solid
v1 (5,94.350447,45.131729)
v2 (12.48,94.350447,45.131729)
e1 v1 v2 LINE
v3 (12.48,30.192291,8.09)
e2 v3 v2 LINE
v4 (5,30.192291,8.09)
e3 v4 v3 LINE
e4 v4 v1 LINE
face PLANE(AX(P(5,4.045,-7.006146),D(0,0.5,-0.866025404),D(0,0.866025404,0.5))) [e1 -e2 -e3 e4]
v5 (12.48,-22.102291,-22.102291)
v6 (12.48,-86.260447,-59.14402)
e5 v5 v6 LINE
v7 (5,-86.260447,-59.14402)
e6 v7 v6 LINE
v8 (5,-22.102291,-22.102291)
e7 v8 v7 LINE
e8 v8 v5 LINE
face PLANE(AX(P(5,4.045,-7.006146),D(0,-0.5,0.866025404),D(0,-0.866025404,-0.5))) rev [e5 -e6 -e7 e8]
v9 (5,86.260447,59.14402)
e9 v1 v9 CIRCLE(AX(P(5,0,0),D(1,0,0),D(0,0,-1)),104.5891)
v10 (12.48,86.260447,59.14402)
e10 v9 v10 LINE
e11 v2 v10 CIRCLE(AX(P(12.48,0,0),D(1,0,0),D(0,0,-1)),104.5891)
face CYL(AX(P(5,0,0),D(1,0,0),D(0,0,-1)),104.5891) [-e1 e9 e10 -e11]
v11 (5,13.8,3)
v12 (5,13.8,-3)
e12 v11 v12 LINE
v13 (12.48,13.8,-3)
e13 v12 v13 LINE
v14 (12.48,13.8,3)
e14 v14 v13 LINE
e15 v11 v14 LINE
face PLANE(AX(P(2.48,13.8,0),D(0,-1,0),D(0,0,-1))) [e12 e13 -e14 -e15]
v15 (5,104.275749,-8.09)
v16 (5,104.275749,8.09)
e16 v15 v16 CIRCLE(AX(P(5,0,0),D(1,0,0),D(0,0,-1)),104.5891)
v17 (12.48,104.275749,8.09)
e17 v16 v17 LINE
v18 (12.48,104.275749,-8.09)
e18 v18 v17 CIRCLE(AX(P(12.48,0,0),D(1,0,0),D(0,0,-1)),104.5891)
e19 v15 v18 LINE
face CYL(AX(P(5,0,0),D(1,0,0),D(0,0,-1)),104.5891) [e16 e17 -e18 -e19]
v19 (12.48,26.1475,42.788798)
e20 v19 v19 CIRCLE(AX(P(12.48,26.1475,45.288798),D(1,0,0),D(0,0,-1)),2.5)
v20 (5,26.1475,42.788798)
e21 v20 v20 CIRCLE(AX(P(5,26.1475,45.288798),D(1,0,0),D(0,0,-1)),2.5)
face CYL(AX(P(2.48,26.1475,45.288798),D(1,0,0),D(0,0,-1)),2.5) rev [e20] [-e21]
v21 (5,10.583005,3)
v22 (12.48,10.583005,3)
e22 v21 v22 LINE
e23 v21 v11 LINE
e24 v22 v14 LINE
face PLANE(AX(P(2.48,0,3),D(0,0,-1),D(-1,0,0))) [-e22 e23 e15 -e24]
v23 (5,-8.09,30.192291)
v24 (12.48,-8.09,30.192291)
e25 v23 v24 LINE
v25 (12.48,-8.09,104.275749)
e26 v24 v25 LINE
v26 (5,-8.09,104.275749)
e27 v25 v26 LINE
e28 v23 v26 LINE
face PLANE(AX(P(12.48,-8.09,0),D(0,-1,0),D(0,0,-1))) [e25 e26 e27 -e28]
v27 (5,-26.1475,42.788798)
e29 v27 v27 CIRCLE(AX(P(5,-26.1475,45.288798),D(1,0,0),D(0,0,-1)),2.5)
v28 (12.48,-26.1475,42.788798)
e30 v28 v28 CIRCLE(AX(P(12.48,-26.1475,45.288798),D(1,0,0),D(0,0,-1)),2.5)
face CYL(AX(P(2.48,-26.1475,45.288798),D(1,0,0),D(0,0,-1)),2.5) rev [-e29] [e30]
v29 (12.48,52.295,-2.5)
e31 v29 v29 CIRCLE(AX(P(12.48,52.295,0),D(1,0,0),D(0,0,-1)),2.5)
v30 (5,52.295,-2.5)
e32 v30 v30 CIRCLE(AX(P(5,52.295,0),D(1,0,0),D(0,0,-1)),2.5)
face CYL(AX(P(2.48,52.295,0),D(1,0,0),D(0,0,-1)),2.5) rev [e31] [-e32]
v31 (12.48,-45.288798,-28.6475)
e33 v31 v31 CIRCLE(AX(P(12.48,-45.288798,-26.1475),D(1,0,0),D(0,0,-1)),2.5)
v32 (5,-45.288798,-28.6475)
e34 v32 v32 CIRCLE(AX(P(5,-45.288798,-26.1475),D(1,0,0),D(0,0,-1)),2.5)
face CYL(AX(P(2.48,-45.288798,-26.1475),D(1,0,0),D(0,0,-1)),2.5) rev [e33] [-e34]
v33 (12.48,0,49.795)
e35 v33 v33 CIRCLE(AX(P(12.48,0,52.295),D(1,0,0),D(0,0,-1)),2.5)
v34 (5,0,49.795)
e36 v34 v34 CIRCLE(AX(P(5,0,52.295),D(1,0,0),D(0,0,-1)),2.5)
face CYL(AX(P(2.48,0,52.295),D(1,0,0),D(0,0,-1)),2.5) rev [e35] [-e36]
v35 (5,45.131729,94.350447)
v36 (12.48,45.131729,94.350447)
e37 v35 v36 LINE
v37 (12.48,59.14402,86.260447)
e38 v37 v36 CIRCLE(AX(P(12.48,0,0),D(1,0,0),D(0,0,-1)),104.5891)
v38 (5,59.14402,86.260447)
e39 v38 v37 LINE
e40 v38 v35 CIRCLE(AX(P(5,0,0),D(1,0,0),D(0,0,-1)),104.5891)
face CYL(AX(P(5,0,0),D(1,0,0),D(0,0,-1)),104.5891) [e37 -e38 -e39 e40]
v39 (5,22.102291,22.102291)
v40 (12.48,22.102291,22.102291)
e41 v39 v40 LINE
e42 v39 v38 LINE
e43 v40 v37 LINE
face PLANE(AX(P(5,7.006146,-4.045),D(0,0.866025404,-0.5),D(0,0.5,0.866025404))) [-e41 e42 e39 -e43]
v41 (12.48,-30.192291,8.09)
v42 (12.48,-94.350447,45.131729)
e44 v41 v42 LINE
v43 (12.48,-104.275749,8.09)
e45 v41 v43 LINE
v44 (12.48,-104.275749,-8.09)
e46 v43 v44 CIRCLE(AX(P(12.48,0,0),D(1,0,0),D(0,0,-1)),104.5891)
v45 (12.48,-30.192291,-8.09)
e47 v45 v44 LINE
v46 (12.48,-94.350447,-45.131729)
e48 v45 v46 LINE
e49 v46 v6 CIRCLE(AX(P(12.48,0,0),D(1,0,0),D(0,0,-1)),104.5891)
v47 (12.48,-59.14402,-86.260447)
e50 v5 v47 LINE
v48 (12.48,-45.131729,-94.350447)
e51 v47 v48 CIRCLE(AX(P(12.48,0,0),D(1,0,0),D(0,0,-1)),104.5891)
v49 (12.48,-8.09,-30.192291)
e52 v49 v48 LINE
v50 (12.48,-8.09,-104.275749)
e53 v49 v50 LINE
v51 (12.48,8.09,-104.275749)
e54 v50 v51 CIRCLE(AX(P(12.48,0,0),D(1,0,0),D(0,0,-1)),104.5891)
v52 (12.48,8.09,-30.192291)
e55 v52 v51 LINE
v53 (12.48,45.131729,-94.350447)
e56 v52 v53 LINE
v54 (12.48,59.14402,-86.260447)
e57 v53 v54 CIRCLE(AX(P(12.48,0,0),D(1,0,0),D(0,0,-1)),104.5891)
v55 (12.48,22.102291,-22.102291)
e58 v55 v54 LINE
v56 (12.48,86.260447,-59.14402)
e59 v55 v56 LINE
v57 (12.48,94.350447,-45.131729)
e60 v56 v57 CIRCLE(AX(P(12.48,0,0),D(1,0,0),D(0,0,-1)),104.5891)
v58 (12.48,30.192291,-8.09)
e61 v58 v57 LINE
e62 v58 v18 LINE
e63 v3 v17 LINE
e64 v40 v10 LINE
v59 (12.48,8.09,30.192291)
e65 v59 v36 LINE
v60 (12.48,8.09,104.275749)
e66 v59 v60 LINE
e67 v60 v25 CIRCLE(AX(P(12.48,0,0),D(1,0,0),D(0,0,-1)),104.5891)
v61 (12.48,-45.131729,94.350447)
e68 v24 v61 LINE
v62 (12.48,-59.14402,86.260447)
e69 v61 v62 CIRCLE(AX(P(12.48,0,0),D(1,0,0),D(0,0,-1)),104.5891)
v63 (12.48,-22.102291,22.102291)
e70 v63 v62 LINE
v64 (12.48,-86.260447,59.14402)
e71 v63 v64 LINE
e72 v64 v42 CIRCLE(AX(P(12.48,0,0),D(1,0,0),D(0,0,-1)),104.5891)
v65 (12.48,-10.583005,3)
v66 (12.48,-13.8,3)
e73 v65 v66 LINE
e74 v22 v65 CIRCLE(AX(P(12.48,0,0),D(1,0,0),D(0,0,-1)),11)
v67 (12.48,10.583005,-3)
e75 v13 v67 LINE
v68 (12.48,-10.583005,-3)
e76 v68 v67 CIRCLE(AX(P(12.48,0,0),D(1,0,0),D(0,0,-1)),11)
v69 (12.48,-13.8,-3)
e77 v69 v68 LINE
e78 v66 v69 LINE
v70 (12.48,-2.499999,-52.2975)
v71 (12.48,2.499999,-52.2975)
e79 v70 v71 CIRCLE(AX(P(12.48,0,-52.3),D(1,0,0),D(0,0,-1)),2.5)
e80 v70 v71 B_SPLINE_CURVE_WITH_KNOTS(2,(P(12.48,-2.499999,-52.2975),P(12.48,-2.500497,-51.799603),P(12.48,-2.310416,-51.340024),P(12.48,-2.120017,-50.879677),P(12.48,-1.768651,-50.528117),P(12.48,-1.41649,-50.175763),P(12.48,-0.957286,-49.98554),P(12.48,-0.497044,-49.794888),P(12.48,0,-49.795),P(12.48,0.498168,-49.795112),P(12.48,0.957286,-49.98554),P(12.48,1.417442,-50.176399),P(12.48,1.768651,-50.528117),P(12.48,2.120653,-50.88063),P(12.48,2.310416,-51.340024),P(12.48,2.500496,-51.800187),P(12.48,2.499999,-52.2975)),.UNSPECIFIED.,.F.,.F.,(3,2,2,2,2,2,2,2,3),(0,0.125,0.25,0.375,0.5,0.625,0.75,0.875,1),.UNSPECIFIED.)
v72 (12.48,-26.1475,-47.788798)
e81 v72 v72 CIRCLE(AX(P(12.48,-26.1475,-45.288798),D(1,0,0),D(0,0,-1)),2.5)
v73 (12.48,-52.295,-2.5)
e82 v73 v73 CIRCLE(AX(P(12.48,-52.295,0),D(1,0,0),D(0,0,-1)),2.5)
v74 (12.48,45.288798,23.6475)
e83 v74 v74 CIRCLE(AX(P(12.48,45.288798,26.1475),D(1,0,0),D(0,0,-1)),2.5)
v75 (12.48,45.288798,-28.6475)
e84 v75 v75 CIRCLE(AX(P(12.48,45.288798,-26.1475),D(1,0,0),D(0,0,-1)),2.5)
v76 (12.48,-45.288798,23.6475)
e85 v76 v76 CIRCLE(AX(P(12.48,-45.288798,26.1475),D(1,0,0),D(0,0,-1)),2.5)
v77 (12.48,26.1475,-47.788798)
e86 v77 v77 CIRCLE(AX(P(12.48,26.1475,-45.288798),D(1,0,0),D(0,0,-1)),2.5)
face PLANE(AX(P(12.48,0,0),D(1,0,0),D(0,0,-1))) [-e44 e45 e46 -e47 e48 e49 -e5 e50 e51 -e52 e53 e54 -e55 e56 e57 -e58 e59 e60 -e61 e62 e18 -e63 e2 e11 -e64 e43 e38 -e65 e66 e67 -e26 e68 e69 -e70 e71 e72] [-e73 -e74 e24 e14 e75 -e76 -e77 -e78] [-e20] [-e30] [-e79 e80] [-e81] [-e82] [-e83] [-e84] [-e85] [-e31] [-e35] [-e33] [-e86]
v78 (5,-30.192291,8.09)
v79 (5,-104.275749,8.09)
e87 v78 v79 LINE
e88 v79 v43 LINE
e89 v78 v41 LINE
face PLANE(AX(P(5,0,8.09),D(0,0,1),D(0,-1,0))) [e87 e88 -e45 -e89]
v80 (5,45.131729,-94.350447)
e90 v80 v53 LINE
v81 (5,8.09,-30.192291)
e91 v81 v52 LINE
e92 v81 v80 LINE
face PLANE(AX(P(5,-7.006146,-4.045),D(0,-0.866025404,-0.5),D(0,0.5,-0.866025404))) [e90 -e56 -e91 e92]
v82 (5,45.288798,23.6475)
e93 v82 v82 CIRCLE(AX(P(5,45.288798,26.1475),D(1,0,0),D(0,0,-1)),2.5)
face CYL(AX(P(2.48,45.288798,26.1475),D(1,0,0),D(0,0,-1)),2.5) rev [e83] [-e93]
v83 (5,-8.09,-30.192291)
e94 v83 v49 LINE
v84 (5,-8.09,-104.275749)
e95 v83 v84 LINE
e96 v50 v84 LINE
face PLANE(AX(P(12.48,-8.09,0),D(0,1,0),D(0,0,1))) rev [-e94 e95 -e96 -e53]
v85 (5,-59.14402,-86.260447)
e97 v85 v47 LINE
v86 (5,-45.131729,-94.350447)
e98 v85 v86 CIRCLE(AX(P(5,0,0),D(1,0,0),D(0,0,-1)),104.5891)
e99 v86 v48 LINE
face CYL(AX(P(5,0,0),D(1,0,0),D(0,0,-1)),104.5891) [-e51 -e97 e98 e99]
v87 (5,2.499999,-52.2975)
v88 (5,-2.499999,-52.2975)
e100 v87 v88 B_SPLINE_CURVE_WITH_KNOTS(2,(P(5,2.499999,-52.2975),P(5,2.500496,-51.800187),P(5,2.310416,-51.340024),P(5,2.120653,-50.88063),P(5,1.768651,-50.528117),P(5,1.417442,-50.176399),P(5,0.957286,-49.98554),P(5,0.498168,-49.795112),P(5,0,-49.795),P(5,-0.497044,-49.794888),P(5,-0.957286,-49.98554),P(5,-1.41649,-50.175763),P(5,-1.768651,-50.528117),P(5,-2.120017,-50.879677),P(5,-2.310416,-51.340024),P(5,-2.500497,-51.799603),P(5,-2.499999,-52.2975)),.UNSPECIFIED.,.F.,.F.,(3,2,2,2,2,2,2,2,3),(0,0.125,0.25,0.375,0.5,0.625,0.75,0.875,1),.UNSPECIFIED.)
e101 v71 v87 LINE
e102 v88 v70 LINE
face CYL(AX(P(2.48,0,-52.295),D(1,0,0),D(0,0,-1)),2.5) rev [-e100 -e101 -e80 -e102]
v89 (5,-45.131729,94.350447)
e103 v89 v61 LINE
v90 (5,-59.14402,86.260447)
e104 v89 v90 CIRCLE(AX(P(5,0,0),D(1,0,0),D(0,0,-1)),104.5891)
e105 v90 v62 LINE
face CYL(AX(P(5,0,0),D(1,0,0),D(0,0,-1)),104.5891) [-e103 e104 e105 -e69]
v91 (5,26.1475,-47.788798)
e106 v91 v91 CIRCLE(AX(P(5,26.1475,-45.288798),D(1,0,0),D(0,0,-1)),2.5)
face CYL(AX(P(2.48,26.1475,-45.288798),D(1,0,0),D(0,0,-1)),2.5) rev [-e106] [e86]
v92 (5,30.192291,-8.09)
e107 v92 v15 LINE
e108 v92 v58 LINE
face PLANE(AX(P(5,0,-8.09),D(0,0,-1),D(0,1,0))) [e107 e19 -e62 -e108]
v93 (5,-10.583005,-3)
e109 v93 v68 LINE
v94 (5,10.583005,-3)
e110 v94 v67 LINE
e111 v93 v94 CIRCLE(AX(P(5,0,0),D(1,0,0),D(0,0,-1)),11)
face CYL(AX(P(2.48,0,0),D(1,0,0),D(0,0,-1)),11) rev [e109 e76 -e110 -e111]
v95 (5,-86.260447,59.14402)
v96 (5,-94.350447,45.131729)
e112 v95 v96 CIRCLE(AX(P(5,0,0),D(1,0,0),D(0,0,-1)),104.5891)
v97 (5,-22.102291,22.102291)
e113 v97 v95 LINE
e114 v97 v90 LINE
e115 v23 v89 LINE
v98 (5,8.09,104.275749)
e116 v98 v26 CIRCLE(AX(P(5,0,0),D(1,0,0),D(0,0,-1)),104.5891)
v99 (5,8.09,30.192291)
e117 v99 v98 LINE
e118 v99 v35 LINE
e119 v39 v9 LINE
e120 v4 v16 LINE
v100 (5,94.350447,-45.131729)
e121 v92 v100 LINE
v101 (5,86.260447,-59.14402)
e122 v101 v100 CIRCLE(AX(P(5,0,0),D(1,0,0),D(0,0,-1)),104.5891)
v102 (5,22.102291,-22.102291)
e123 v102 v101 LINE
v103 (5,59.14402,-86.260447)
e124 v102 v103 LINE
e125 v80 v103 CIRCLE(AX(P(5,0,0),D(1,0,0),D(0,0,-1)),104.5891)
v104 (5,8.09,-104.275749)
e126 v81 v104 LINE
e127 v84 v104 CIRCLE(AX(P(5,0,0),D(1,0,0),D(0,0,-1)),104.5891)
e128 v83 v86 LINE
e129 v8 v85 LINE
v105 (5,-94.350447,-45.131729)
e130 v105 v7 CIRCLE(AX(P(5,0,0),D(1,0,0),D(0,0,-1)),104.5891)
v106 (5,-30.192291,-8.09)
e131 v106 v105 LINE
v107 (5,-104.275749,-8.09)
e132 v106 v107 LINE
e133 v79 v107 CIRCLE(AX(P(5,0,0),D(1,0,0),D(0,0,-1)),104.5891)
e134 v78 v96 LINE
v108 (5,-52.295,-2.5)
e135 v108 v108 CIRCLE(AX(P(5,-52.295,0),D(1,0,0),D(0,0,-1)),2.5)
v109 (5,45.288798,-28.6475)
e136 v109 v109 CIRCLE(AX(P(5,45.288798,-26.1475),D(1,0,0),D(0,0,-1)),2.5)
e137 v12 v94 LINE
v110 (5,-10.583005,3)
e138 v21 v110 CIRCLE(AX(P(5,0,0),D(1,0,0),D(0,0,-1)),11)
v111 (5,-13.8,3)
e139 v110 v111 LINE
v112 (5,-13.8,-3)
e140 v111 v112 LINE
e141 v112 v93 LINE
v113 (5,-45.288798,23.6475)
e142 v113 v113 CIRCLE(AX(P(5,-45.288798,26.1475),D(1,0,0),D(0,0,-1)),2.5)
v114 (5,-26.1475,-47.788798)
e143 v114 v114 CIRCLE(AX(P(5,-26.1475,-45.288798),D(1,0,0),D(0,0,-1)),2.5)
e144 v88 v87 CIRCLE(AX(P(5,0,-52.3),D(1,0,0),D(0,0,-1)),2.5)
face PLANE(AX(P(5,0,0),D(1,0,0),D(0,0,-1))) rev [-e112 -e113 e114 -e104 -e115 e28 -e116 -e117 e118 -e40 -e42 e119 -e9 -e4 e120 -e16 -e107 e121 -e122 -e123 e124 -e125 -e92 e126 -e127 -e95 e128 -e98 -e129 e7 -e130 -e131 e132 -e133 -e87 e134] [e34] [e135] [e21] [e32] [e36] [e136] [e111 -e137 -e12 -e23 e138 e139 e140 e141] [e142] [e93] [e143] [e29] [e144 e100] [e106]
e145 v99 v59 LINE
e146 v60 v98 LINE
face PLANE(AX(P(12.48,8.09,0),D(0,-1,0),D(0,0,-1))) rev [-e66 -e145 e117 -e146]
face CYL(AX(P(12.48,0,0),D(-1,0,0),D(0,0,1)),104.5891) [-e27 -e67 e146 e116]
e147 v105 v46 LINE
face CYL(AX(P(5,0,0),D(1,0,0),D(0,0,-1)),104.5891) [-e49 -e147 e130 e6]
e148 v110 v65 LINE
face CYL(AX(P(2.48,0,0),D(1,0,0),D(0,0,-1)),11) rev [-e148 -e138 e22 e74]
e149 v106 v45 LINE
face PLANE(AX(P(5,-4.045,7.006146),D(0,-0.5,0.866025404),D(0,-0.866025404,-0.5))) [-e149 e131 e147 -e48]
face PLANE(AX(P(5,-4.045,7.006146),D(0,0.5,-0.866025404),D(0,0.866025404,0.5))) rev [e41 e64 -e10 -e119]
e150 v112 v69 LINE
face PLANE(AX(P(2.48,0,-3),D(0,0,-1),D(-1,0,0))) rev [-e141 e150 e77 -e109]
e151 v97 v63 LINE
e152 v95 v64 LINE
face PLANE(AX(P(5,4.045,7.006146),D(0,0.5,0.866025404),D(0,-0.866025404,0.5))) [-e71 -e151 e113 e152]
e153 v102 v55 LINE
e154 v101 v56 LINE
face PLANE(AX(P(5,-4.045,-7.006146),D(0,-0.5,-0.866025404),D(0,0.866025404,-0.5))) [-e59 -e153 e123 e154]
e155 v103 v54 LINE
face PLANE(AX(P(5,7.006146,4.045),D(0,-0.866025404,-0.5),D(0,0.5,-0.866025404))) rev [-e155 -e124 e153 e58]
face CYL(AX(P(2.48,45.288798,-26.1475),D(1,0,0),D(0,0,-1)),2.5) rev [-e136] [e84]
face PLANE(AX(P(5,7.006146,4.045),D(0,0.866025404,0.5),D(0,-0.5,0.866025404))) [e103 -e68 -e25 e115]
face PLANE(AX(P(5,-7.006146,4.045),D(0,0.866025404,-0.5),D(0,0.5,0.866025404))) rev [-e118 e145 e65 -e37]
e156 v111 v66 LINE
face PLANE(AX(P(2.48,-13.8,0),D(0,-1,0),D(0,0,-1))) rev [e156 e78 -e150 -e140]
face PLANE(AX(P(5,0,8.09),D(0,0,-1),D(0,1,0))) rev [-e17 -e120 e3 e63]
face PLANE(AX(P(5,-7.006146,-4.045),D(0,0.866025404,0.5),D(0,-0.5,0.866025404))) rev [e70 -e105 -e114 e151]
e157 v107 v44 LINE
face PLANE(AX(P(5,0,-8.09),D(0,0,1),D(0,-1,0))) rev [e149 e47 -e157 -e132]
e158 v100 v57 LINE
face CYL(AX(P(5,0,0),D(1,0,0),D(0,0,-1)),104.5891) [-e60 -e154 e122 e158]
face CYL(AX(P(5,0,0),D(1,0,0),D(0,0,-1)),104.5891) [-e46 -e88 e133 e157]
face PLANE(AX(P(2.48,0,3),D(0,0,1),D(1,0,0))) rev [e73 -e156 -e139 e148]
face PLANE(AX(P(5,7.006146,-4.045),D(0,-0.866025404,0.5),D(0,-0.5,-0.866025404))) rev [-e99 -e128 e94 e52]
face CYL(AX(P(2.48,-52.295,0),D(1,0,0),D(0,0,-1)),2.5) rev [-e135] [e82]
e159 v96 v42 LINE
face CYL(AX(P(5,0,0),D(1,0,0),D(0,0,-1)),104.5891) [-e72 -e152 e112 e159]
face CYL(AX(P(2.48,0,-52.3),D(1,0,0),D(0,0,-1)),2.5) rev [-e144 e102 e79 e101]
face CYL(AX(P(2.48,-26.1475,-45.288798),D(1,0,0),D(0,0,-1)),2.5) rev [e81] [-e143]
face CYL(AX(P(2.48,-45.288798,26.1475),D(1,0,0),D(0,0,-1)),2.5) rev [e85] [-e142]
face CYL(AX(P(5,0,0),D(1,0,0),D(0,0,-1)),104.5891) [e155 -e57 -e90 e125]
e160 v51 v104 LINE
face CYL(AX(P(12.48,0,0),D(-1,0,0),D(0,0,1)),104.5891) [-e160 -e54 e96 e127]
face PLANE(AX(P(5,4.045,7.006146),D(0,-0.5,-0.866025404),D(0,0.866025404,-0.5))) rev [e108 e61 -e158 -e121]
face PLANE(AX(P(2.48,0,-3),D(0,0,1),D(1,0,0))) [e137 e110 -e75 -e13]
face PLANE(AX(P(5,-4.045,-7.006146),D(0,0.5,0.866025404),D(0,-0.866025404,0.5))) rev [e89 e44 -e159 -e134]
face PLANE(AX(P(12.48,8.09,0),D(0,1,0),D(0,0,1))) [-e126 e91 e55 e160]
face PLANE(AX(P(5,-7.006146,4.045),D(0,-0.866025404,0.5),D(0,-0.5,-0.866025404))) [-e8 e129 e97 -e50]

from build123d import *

# Parameters (mm, degrees)
SKETCH1_W           = 450
SKETCH1_H           = 450
BOSS_EXTRUDE1_DEPTH = 5
BOSS_EXTRUDE2_DEPTH = 7.48
BOSS_EXTRUDE3_DEPTH = 7.48
SKETCH6_W           = 450
SKETCH6_H           = 450
CUT_EXTRUDE1_DEPTH  = 5
SKETCH7_R           = 11
SKETCH7_R_2         = 2.5
CUT_EXTRUDE2_DEPTH  = 10
SKETCH8_R           = 209.3091
SKETCH8_R_2         = 104.5891
CUT_EXTRUDE3_DEPTH  = 10
BOSS_EXTRUDE4_DEPTH = 7.48
SKETCH11_R          = 2.5
CUT_EXTRUDE5_DEPTH  = 10


# Read off the part's stored shape, not the designer's step: Boss-Extrude2
with BuildPart() as part:
    # Sketch1 → Boss-Extrude1 (new body)
    with BuildSketch(Plane(origin=(0, 0, 0), x_dir=(0, 0, -1), z_dir=(1, 0, 0))):
        Rectangle(SKETCH1_W, SKETCH1_H)
    extrude(amount=BOSS_EXTRUDE1_DEPTH)

    # Boss-Extrude2 outline → Boss-Extrude2 (add)
    with BuildSketch(Plane(origin=(5, 0, 0), x_dir=(0, 0, -1), z_dir=(1, 0, 0))):
        with BuildLine():
            Line((-164.971757583, 8.09), (-209.152698388, 8.09))
            ThreePointArc((-209.152698388, 8.09), (-209.3091, 0), (-209.152698388, -8.09))
            Line((-209.152698388, -8.09), (-164.971757583, -8.09))
            ThreePointArc((-164.971757583, -8.09), (-116.792827049, -116.792827049), (-8.09, -164.971757583))
            Line((-8.09, -164.971757583), (-8.09, -209.152698388))
            ThreePointArc((-8.09, -209.152698388), (0, -209.3091), (8.09, -209.152698388))
            Line((8.09, -209.152698388), (8.09, -164.971757583))
            ThreePointArc((8.09, -164.971757583), (116.792827049, -116.792827049), (164.971757583, -8.09))
            Line((164.971757583, -8.09), (209.152698388, -8.09))
            ThreePointArc((209.152698388, -8.09), (209.3091, 0), (209.152698388, 8.09))
            Line((209.152698388, 8.09), (164.971757583, 8.09))
            ThreePointArc((164.971757583, 8.09), (116.792827049, 116.792827049), (8.09, 164.971757583))
            Line((8.09, 164.971757583), (8.09, 209.152698388))
            ThreePointArc((8.09, 209.152698388), (0, 209.3091), (-8.09, 209.152698388))
            Line((-8.09, 209.152698388), (-8.09, 164.971757583))
            ThreePointArc((-8.09, 164.971757583), (-116.792827049, 116.792827049), (-164.971757583, 8.09))
        make_face()
        with BuildLine():
            Line((148.770198629, 8.09), (104.538333308, 8.09))
            ThreePointArc((104.538333308, 8.09), (104.8509, 0), (104.538333308, -8.09))
            Line((104.538333308, -8.09), (148.770198629, -8.09))
            ThreePointArc((148.770198629, -8.09), (105.351839329, -105.351839329), (8.09, -148.770198629))
            Line((8.09, -148.770198629), (8.09, -104.538333308))
            ThreePointArc((8.09, -104.538333308), (0, -104.8509), (-8.09, -104.538333308))
            Line((-8.09, -104.538333308), (-8.09, -148.770198629))
            ThreePointArc((-8.09, -148.770198629), (-105.351839329, -105.351839329), (-148.770198629, -8.09))
            Line((-148.770198629, -8.09), (-104.538333308, -8.09))
            ThreePointArc((-104.538333308, -8.09), (-104.8509, 0), (-104.538333308, 8.09))
            Line((-104.538333308, 8.09), (-148.770198629, 8.09))
            ThreePointArc((-148.770198629, 8.09), (-105.351839329, 105.351839329), (-8.09, 148.770198629))
            Line((-8.09, 148.770198629), (-8.09, 104.538333308))
            ThreePointArc((-8.09, 104.538333308), (0, 104.8509), (8.09, 104.538333308))
            Line((8.09, 104.538333308), (8.09, 148.770198629))
            ThreePointArc((8.09, 148.770198629), (105.351839329, 105.351839329), (148.770198629, 8.09))
        make_face(mode=Mode.SUBTRACT)
    extrude(amount=BOSS_EXTRUDE2_DEPTH)

    # Sketch5 → Boss-Extrude3 (add)
    with BuildSketch(Plane(origin=(5, 0, 0), x_dir=(0, 0, -1), z_dir=(1, 0, 0))):
        with BuildLine():
            Line((-19.319547743, 8.09), (-104.275748565, 8.09))
            ThreePointArc((-104.275748565, 8.09), (-104.5891, 0), (-104.275748565, -8.09))
            Line((-104.275748565, -8.09), (-19.319547743, -8.09))
            ThreePointArc((-19.319547743, -8.09), (0, -20.945), (19.319547743, -8.09))
            Line((19.319547743, -8.09), (104.275748565, -8.09))
            ThreePointArc((104.275748565, -8.09), (104.5891, 0), (104.275748565, 8.09))
            Line((104.275748565, 8.09), (19.319547743, 8.09))
            ThreePointArc((19.319547743, 8.09), (0, 20.945), (-19.319547743, 8.09))
        make_face()
    extrude(amount=BOSS_EXTRUDE3_DEPTH)

    # Sketch6 → Cut-Extrude1 (cut)
    with BuildSketch(Plane.ZY):
        Rectangle(SKETCH6_W, SKETCH6_H)
    extrude(amount=-CUT_EXTRUDE1_DEPTH, mode=Mode.SUBTRACT)


with BuildPart() as cut_extrude1_piece_1:
    # of the separate pieces the step leaves, piece 1, a body of its own (cut_extrude1_pieces)
    add(part.part.solids().sort_by_distance((5, 209.152698388, 8.09))[0])


with BuildPart() as cut_extrude1_piece_2:
    # of the separate pieces the step leaves, piece 2, a body of its own (cut_extrude1_pieces)
    add(part.part.solids().sort_by_distance((5, 8.09, -104.275748565))[0])


with BuildPart() as cut_extrude2_tool:
    # Sketch7 → Cut-Extrude2 (new body)
    with BuildSketch(Plane(origin=(12.48, 0, 0), x_dir=(0, 0, -1), z_dir=(1, 0, 0))):
        Circle(SKETCH7_R)
        with Locations((-183.1891, 0)):
            Circle(SKETCH7_R_2)
        with Locations((-130.9659, 0)):
            Circle(SKETCH7_R_2)
        with Locations((0, -183.1891)):
            Circle(SKETCH7_R_2)
        with Locations((0, -130.9659)):
            Circle(SKETCH7_R_2)
        with Locations((183.1891, 0)):
            Circle(SKETCH7_R_2)
        with Locations((52.3, 0)):
            Circle(SKETCH7_R_2)
        with Locations((-52.295, 0)):
            Circle(SKETCH7_R_2)
        with Locations((0, 183.1891)):
            Circle(SKETCH7_R_2)
        with Locations((0, 130.9659)):
            Circle(SKETCH7_R_2)
        with BuildLine():
            Line((-3, 13.8), (-3, 10.583005244))
            ThreePointArc((-3, 10.583005244), (0, 11), (3, 10.583005244))
            Line((3, 10.583005244), (3, 13.8))
            Line((3, 13.8), (-3, 13.8))
        make_face()
        with BuildLine():
            ThreePointArc((3, -10.583005244), (0, -11), (-3, -10.583005244))
            Line((-3, -10.583005244), (-3, -13.8))
            Line((-3, -13.8), (3, -13.8))
            Line((3, -13.8), (3, -10.583005244))
        make_face()
        with Locations((130.9659, 0)):
            Circle(SKETCH7_R_2)
    extrude(amount=-CUT_EXTRUDE2_DEPTH)


with BuildPart() as cut_extrude1_piece_1_1:
    add(cut_extrude1_piece_1.part)

    # Cut-Extrude2: cut by cut_extrude2_tool
    add(cut_extrude2_tool.part, mode=Mode.SUBTRACT)

    # Sketch8 → Cut-Extrude3 (cut)
    with BuildSketch(Plane(origin=(12.48, 0, 0), x_dir=(0, 0, -1), z_dir=(1, 0, 0))):
        Circle(SKETCH8_R)
        Circle(SKETCH8_R_2, mode=Mode.SUBTRACT)
    extrude(amount=-CUT_EXTRUDE3_DEPTH, mode=Mode.SUBTRACT)


with BuildPart() as cut_extrude1_piece_2_1:
    add(cut_extrude1_piece_2.part)

    # Cut-Extrude2: cut by cut_extrude2_tool
    add(cut_extrude2_tool.part, mode=Mode.SUBTRACT)

    # Sketch9 → Boss-Extrude4 (add)
    with BuildSketch(Plane(origin=(12.48, 0, 0), x_dir=(0, 0, -1), z_dir=(1, 0, 0))):
        with BuildLine():
            Line((-94.350447256, 45.131728766), (-30.192291033, 8.09))
            Line((-30.192291033, 8.09), (-19.319547743, 8.09))
            ThreePointArc((-19.319547743, 8.09), (0, 20.945), (19.319547743, 8.09))
            Line((19.319547743, 8.09), (30.192291033, 8.09))
            Line((30.192291033, 8.09), (94.350447256, 45.131728766))
            ThreePointArc((94.350447256, 45.131728766), (90.576817559, 52.29455), (86.260447256, 59.144019799))
            Line((86.260447256, 59.144019799), (22.102291033, 22.102291033))
            Line((22.102291033, 22.102291033), (59.144019799, 86.260447256))
            ThreePointArc((59.144019799, 86.260447256), (52.29455, 90.576817559), (45.131728766, 94.350447256))
            Line((45.131728766, 94.350447256), (8.09, 30.192291033))
            Line((8.09, 30.192291033), (8.09, 104.275748565))
            ThreePointArc((8.09, 104.275748565), (0, 104.5891), (-8.09, 104.275748565))
            Line((-8.09, 104.275748565), (-8.09, 30.192291033))
            Line((-8.09, 30.192291033), (-45.131728766, 94.350447256))
            ThreePointArc((-45.131728766, 94.350447256), (-52.29455, 90.576817559), (-59.144019799, 86.260447256))
            Line((-59.144019799, 86.260447256), (-22.102291033, 22.102291033))
            Line((-22.102291033, 22.102291033), (-86.260447256, 59.144019799))
            ThreePointArc((-86.260447256, 59.144019799), (-90.576817559, 52.29455), (-94.350447256, 45.131728766))
        make_face()
        with BuildLine():
            ThreePointArc((19.319547743, -8.09), (0, -20.945), (-19.319547743, -8.09))
            Line((-19.319547743, -8.09), (-30.192291033, -8.09))
            Line((-30.192291033, -8.09), (-94.350447256, -45.131728766))
            ThreePointArc((-94.350447256, -45.131728766), (-90.576817559, -52.29455), (-86.260447256, -59.144019799))
            Line((-86.260447256, -59.144019799), (-22.102291033, -22.102291033))
            Line((-22.102291033, -22.102291033), (-59.144019799, -86.260447256))
            ThreePointArc((-59.144019799, -86.260447256), (-52.29455, -90.576817559), (-45.131728766, -94.350447256))
            Line((-45.131728766, -94.350447256), (-8.09, -30.192291033))
            Line((-8.09, -30.192291033), (-8.09, -104.275748565))
            ThreePointArc((-8.09, -104.275748565), (0, -104.5891), (8.09, -104.275748565))
            Line((8.09, -104.275748565), (8.09, -30.192291033))
            Line((8.09, -30.192291033), (45.131728766, -94.350447256))
            ThreePointArc((45.131728766, -94.350447256), (52.29455, -90.576817559), (59.144019799, -86.260447256))
            Line((59.144019799, -86.260447256), (22.102291033, -22.102291033))
            Line((22.102291033, -22.102291033), (86.260447256, -59.144019799))
            ThreePointArc((86.260447256, -59.144019799), (90.576817559, -52.29455), (94.350447256, -45.131728766))
            Line((94.350447256, -45.131728766), (30.192291033, -8.09))
            Line((30.192291033, -8.09), (19.319547743, -8.09))
        make_face()
    extrude(amount=-BOSS_EXTRUDE4_DEPTH)

    # Sketch11 → Cut-Extrude5 (cut)
    with BuildSketch(Plane(origin=(12.48, 0, 0), x_dir=(0, 0, -1), z_dir=(1, 0, 0))):
        with Locations((-52.295, 0)):
            Circle(SKETCH11_R)
        with Locations((-45.288798491, 26.1475)):
            Circle(SKETCH11_R)
        with Locations((-26.1475, 45.288798491)):
            Circle(SKETCH11_R)
        with Locations((0, 52.295)):
            Circle(SKETCH11_R)
        with Locations((26.1475, 45.288798491)):
            Circle(SKETCH11_R)
        with Locations((45.288798491, 26.1475)):
            Circle(SKETCH11_R)
        with Locations((52.295, 0)):
            Circle(SKETCH11_R)
        with Locations((45.288798491, -26.1475)):
            Circle(SKETCH11_R)
        with Locations((26.1475, -45.288798491)):
            Circle(SKETCH11_R)
        with Locations((0, -52.295)):
            Circle(SKETCH11_R)
        with Locations((-26.1475, -45.288798491)):
            Circle(SKETCH11_R)
        with Locations((-45.288798491, -26.1475)):
            Circle(SKETCH11_R)
    extrude(amount=-CUT_EXTRUDE5_DEPTH, mode=Mode.SUBTRACT)


solid = cut_extrude1_piece_2_1.part
